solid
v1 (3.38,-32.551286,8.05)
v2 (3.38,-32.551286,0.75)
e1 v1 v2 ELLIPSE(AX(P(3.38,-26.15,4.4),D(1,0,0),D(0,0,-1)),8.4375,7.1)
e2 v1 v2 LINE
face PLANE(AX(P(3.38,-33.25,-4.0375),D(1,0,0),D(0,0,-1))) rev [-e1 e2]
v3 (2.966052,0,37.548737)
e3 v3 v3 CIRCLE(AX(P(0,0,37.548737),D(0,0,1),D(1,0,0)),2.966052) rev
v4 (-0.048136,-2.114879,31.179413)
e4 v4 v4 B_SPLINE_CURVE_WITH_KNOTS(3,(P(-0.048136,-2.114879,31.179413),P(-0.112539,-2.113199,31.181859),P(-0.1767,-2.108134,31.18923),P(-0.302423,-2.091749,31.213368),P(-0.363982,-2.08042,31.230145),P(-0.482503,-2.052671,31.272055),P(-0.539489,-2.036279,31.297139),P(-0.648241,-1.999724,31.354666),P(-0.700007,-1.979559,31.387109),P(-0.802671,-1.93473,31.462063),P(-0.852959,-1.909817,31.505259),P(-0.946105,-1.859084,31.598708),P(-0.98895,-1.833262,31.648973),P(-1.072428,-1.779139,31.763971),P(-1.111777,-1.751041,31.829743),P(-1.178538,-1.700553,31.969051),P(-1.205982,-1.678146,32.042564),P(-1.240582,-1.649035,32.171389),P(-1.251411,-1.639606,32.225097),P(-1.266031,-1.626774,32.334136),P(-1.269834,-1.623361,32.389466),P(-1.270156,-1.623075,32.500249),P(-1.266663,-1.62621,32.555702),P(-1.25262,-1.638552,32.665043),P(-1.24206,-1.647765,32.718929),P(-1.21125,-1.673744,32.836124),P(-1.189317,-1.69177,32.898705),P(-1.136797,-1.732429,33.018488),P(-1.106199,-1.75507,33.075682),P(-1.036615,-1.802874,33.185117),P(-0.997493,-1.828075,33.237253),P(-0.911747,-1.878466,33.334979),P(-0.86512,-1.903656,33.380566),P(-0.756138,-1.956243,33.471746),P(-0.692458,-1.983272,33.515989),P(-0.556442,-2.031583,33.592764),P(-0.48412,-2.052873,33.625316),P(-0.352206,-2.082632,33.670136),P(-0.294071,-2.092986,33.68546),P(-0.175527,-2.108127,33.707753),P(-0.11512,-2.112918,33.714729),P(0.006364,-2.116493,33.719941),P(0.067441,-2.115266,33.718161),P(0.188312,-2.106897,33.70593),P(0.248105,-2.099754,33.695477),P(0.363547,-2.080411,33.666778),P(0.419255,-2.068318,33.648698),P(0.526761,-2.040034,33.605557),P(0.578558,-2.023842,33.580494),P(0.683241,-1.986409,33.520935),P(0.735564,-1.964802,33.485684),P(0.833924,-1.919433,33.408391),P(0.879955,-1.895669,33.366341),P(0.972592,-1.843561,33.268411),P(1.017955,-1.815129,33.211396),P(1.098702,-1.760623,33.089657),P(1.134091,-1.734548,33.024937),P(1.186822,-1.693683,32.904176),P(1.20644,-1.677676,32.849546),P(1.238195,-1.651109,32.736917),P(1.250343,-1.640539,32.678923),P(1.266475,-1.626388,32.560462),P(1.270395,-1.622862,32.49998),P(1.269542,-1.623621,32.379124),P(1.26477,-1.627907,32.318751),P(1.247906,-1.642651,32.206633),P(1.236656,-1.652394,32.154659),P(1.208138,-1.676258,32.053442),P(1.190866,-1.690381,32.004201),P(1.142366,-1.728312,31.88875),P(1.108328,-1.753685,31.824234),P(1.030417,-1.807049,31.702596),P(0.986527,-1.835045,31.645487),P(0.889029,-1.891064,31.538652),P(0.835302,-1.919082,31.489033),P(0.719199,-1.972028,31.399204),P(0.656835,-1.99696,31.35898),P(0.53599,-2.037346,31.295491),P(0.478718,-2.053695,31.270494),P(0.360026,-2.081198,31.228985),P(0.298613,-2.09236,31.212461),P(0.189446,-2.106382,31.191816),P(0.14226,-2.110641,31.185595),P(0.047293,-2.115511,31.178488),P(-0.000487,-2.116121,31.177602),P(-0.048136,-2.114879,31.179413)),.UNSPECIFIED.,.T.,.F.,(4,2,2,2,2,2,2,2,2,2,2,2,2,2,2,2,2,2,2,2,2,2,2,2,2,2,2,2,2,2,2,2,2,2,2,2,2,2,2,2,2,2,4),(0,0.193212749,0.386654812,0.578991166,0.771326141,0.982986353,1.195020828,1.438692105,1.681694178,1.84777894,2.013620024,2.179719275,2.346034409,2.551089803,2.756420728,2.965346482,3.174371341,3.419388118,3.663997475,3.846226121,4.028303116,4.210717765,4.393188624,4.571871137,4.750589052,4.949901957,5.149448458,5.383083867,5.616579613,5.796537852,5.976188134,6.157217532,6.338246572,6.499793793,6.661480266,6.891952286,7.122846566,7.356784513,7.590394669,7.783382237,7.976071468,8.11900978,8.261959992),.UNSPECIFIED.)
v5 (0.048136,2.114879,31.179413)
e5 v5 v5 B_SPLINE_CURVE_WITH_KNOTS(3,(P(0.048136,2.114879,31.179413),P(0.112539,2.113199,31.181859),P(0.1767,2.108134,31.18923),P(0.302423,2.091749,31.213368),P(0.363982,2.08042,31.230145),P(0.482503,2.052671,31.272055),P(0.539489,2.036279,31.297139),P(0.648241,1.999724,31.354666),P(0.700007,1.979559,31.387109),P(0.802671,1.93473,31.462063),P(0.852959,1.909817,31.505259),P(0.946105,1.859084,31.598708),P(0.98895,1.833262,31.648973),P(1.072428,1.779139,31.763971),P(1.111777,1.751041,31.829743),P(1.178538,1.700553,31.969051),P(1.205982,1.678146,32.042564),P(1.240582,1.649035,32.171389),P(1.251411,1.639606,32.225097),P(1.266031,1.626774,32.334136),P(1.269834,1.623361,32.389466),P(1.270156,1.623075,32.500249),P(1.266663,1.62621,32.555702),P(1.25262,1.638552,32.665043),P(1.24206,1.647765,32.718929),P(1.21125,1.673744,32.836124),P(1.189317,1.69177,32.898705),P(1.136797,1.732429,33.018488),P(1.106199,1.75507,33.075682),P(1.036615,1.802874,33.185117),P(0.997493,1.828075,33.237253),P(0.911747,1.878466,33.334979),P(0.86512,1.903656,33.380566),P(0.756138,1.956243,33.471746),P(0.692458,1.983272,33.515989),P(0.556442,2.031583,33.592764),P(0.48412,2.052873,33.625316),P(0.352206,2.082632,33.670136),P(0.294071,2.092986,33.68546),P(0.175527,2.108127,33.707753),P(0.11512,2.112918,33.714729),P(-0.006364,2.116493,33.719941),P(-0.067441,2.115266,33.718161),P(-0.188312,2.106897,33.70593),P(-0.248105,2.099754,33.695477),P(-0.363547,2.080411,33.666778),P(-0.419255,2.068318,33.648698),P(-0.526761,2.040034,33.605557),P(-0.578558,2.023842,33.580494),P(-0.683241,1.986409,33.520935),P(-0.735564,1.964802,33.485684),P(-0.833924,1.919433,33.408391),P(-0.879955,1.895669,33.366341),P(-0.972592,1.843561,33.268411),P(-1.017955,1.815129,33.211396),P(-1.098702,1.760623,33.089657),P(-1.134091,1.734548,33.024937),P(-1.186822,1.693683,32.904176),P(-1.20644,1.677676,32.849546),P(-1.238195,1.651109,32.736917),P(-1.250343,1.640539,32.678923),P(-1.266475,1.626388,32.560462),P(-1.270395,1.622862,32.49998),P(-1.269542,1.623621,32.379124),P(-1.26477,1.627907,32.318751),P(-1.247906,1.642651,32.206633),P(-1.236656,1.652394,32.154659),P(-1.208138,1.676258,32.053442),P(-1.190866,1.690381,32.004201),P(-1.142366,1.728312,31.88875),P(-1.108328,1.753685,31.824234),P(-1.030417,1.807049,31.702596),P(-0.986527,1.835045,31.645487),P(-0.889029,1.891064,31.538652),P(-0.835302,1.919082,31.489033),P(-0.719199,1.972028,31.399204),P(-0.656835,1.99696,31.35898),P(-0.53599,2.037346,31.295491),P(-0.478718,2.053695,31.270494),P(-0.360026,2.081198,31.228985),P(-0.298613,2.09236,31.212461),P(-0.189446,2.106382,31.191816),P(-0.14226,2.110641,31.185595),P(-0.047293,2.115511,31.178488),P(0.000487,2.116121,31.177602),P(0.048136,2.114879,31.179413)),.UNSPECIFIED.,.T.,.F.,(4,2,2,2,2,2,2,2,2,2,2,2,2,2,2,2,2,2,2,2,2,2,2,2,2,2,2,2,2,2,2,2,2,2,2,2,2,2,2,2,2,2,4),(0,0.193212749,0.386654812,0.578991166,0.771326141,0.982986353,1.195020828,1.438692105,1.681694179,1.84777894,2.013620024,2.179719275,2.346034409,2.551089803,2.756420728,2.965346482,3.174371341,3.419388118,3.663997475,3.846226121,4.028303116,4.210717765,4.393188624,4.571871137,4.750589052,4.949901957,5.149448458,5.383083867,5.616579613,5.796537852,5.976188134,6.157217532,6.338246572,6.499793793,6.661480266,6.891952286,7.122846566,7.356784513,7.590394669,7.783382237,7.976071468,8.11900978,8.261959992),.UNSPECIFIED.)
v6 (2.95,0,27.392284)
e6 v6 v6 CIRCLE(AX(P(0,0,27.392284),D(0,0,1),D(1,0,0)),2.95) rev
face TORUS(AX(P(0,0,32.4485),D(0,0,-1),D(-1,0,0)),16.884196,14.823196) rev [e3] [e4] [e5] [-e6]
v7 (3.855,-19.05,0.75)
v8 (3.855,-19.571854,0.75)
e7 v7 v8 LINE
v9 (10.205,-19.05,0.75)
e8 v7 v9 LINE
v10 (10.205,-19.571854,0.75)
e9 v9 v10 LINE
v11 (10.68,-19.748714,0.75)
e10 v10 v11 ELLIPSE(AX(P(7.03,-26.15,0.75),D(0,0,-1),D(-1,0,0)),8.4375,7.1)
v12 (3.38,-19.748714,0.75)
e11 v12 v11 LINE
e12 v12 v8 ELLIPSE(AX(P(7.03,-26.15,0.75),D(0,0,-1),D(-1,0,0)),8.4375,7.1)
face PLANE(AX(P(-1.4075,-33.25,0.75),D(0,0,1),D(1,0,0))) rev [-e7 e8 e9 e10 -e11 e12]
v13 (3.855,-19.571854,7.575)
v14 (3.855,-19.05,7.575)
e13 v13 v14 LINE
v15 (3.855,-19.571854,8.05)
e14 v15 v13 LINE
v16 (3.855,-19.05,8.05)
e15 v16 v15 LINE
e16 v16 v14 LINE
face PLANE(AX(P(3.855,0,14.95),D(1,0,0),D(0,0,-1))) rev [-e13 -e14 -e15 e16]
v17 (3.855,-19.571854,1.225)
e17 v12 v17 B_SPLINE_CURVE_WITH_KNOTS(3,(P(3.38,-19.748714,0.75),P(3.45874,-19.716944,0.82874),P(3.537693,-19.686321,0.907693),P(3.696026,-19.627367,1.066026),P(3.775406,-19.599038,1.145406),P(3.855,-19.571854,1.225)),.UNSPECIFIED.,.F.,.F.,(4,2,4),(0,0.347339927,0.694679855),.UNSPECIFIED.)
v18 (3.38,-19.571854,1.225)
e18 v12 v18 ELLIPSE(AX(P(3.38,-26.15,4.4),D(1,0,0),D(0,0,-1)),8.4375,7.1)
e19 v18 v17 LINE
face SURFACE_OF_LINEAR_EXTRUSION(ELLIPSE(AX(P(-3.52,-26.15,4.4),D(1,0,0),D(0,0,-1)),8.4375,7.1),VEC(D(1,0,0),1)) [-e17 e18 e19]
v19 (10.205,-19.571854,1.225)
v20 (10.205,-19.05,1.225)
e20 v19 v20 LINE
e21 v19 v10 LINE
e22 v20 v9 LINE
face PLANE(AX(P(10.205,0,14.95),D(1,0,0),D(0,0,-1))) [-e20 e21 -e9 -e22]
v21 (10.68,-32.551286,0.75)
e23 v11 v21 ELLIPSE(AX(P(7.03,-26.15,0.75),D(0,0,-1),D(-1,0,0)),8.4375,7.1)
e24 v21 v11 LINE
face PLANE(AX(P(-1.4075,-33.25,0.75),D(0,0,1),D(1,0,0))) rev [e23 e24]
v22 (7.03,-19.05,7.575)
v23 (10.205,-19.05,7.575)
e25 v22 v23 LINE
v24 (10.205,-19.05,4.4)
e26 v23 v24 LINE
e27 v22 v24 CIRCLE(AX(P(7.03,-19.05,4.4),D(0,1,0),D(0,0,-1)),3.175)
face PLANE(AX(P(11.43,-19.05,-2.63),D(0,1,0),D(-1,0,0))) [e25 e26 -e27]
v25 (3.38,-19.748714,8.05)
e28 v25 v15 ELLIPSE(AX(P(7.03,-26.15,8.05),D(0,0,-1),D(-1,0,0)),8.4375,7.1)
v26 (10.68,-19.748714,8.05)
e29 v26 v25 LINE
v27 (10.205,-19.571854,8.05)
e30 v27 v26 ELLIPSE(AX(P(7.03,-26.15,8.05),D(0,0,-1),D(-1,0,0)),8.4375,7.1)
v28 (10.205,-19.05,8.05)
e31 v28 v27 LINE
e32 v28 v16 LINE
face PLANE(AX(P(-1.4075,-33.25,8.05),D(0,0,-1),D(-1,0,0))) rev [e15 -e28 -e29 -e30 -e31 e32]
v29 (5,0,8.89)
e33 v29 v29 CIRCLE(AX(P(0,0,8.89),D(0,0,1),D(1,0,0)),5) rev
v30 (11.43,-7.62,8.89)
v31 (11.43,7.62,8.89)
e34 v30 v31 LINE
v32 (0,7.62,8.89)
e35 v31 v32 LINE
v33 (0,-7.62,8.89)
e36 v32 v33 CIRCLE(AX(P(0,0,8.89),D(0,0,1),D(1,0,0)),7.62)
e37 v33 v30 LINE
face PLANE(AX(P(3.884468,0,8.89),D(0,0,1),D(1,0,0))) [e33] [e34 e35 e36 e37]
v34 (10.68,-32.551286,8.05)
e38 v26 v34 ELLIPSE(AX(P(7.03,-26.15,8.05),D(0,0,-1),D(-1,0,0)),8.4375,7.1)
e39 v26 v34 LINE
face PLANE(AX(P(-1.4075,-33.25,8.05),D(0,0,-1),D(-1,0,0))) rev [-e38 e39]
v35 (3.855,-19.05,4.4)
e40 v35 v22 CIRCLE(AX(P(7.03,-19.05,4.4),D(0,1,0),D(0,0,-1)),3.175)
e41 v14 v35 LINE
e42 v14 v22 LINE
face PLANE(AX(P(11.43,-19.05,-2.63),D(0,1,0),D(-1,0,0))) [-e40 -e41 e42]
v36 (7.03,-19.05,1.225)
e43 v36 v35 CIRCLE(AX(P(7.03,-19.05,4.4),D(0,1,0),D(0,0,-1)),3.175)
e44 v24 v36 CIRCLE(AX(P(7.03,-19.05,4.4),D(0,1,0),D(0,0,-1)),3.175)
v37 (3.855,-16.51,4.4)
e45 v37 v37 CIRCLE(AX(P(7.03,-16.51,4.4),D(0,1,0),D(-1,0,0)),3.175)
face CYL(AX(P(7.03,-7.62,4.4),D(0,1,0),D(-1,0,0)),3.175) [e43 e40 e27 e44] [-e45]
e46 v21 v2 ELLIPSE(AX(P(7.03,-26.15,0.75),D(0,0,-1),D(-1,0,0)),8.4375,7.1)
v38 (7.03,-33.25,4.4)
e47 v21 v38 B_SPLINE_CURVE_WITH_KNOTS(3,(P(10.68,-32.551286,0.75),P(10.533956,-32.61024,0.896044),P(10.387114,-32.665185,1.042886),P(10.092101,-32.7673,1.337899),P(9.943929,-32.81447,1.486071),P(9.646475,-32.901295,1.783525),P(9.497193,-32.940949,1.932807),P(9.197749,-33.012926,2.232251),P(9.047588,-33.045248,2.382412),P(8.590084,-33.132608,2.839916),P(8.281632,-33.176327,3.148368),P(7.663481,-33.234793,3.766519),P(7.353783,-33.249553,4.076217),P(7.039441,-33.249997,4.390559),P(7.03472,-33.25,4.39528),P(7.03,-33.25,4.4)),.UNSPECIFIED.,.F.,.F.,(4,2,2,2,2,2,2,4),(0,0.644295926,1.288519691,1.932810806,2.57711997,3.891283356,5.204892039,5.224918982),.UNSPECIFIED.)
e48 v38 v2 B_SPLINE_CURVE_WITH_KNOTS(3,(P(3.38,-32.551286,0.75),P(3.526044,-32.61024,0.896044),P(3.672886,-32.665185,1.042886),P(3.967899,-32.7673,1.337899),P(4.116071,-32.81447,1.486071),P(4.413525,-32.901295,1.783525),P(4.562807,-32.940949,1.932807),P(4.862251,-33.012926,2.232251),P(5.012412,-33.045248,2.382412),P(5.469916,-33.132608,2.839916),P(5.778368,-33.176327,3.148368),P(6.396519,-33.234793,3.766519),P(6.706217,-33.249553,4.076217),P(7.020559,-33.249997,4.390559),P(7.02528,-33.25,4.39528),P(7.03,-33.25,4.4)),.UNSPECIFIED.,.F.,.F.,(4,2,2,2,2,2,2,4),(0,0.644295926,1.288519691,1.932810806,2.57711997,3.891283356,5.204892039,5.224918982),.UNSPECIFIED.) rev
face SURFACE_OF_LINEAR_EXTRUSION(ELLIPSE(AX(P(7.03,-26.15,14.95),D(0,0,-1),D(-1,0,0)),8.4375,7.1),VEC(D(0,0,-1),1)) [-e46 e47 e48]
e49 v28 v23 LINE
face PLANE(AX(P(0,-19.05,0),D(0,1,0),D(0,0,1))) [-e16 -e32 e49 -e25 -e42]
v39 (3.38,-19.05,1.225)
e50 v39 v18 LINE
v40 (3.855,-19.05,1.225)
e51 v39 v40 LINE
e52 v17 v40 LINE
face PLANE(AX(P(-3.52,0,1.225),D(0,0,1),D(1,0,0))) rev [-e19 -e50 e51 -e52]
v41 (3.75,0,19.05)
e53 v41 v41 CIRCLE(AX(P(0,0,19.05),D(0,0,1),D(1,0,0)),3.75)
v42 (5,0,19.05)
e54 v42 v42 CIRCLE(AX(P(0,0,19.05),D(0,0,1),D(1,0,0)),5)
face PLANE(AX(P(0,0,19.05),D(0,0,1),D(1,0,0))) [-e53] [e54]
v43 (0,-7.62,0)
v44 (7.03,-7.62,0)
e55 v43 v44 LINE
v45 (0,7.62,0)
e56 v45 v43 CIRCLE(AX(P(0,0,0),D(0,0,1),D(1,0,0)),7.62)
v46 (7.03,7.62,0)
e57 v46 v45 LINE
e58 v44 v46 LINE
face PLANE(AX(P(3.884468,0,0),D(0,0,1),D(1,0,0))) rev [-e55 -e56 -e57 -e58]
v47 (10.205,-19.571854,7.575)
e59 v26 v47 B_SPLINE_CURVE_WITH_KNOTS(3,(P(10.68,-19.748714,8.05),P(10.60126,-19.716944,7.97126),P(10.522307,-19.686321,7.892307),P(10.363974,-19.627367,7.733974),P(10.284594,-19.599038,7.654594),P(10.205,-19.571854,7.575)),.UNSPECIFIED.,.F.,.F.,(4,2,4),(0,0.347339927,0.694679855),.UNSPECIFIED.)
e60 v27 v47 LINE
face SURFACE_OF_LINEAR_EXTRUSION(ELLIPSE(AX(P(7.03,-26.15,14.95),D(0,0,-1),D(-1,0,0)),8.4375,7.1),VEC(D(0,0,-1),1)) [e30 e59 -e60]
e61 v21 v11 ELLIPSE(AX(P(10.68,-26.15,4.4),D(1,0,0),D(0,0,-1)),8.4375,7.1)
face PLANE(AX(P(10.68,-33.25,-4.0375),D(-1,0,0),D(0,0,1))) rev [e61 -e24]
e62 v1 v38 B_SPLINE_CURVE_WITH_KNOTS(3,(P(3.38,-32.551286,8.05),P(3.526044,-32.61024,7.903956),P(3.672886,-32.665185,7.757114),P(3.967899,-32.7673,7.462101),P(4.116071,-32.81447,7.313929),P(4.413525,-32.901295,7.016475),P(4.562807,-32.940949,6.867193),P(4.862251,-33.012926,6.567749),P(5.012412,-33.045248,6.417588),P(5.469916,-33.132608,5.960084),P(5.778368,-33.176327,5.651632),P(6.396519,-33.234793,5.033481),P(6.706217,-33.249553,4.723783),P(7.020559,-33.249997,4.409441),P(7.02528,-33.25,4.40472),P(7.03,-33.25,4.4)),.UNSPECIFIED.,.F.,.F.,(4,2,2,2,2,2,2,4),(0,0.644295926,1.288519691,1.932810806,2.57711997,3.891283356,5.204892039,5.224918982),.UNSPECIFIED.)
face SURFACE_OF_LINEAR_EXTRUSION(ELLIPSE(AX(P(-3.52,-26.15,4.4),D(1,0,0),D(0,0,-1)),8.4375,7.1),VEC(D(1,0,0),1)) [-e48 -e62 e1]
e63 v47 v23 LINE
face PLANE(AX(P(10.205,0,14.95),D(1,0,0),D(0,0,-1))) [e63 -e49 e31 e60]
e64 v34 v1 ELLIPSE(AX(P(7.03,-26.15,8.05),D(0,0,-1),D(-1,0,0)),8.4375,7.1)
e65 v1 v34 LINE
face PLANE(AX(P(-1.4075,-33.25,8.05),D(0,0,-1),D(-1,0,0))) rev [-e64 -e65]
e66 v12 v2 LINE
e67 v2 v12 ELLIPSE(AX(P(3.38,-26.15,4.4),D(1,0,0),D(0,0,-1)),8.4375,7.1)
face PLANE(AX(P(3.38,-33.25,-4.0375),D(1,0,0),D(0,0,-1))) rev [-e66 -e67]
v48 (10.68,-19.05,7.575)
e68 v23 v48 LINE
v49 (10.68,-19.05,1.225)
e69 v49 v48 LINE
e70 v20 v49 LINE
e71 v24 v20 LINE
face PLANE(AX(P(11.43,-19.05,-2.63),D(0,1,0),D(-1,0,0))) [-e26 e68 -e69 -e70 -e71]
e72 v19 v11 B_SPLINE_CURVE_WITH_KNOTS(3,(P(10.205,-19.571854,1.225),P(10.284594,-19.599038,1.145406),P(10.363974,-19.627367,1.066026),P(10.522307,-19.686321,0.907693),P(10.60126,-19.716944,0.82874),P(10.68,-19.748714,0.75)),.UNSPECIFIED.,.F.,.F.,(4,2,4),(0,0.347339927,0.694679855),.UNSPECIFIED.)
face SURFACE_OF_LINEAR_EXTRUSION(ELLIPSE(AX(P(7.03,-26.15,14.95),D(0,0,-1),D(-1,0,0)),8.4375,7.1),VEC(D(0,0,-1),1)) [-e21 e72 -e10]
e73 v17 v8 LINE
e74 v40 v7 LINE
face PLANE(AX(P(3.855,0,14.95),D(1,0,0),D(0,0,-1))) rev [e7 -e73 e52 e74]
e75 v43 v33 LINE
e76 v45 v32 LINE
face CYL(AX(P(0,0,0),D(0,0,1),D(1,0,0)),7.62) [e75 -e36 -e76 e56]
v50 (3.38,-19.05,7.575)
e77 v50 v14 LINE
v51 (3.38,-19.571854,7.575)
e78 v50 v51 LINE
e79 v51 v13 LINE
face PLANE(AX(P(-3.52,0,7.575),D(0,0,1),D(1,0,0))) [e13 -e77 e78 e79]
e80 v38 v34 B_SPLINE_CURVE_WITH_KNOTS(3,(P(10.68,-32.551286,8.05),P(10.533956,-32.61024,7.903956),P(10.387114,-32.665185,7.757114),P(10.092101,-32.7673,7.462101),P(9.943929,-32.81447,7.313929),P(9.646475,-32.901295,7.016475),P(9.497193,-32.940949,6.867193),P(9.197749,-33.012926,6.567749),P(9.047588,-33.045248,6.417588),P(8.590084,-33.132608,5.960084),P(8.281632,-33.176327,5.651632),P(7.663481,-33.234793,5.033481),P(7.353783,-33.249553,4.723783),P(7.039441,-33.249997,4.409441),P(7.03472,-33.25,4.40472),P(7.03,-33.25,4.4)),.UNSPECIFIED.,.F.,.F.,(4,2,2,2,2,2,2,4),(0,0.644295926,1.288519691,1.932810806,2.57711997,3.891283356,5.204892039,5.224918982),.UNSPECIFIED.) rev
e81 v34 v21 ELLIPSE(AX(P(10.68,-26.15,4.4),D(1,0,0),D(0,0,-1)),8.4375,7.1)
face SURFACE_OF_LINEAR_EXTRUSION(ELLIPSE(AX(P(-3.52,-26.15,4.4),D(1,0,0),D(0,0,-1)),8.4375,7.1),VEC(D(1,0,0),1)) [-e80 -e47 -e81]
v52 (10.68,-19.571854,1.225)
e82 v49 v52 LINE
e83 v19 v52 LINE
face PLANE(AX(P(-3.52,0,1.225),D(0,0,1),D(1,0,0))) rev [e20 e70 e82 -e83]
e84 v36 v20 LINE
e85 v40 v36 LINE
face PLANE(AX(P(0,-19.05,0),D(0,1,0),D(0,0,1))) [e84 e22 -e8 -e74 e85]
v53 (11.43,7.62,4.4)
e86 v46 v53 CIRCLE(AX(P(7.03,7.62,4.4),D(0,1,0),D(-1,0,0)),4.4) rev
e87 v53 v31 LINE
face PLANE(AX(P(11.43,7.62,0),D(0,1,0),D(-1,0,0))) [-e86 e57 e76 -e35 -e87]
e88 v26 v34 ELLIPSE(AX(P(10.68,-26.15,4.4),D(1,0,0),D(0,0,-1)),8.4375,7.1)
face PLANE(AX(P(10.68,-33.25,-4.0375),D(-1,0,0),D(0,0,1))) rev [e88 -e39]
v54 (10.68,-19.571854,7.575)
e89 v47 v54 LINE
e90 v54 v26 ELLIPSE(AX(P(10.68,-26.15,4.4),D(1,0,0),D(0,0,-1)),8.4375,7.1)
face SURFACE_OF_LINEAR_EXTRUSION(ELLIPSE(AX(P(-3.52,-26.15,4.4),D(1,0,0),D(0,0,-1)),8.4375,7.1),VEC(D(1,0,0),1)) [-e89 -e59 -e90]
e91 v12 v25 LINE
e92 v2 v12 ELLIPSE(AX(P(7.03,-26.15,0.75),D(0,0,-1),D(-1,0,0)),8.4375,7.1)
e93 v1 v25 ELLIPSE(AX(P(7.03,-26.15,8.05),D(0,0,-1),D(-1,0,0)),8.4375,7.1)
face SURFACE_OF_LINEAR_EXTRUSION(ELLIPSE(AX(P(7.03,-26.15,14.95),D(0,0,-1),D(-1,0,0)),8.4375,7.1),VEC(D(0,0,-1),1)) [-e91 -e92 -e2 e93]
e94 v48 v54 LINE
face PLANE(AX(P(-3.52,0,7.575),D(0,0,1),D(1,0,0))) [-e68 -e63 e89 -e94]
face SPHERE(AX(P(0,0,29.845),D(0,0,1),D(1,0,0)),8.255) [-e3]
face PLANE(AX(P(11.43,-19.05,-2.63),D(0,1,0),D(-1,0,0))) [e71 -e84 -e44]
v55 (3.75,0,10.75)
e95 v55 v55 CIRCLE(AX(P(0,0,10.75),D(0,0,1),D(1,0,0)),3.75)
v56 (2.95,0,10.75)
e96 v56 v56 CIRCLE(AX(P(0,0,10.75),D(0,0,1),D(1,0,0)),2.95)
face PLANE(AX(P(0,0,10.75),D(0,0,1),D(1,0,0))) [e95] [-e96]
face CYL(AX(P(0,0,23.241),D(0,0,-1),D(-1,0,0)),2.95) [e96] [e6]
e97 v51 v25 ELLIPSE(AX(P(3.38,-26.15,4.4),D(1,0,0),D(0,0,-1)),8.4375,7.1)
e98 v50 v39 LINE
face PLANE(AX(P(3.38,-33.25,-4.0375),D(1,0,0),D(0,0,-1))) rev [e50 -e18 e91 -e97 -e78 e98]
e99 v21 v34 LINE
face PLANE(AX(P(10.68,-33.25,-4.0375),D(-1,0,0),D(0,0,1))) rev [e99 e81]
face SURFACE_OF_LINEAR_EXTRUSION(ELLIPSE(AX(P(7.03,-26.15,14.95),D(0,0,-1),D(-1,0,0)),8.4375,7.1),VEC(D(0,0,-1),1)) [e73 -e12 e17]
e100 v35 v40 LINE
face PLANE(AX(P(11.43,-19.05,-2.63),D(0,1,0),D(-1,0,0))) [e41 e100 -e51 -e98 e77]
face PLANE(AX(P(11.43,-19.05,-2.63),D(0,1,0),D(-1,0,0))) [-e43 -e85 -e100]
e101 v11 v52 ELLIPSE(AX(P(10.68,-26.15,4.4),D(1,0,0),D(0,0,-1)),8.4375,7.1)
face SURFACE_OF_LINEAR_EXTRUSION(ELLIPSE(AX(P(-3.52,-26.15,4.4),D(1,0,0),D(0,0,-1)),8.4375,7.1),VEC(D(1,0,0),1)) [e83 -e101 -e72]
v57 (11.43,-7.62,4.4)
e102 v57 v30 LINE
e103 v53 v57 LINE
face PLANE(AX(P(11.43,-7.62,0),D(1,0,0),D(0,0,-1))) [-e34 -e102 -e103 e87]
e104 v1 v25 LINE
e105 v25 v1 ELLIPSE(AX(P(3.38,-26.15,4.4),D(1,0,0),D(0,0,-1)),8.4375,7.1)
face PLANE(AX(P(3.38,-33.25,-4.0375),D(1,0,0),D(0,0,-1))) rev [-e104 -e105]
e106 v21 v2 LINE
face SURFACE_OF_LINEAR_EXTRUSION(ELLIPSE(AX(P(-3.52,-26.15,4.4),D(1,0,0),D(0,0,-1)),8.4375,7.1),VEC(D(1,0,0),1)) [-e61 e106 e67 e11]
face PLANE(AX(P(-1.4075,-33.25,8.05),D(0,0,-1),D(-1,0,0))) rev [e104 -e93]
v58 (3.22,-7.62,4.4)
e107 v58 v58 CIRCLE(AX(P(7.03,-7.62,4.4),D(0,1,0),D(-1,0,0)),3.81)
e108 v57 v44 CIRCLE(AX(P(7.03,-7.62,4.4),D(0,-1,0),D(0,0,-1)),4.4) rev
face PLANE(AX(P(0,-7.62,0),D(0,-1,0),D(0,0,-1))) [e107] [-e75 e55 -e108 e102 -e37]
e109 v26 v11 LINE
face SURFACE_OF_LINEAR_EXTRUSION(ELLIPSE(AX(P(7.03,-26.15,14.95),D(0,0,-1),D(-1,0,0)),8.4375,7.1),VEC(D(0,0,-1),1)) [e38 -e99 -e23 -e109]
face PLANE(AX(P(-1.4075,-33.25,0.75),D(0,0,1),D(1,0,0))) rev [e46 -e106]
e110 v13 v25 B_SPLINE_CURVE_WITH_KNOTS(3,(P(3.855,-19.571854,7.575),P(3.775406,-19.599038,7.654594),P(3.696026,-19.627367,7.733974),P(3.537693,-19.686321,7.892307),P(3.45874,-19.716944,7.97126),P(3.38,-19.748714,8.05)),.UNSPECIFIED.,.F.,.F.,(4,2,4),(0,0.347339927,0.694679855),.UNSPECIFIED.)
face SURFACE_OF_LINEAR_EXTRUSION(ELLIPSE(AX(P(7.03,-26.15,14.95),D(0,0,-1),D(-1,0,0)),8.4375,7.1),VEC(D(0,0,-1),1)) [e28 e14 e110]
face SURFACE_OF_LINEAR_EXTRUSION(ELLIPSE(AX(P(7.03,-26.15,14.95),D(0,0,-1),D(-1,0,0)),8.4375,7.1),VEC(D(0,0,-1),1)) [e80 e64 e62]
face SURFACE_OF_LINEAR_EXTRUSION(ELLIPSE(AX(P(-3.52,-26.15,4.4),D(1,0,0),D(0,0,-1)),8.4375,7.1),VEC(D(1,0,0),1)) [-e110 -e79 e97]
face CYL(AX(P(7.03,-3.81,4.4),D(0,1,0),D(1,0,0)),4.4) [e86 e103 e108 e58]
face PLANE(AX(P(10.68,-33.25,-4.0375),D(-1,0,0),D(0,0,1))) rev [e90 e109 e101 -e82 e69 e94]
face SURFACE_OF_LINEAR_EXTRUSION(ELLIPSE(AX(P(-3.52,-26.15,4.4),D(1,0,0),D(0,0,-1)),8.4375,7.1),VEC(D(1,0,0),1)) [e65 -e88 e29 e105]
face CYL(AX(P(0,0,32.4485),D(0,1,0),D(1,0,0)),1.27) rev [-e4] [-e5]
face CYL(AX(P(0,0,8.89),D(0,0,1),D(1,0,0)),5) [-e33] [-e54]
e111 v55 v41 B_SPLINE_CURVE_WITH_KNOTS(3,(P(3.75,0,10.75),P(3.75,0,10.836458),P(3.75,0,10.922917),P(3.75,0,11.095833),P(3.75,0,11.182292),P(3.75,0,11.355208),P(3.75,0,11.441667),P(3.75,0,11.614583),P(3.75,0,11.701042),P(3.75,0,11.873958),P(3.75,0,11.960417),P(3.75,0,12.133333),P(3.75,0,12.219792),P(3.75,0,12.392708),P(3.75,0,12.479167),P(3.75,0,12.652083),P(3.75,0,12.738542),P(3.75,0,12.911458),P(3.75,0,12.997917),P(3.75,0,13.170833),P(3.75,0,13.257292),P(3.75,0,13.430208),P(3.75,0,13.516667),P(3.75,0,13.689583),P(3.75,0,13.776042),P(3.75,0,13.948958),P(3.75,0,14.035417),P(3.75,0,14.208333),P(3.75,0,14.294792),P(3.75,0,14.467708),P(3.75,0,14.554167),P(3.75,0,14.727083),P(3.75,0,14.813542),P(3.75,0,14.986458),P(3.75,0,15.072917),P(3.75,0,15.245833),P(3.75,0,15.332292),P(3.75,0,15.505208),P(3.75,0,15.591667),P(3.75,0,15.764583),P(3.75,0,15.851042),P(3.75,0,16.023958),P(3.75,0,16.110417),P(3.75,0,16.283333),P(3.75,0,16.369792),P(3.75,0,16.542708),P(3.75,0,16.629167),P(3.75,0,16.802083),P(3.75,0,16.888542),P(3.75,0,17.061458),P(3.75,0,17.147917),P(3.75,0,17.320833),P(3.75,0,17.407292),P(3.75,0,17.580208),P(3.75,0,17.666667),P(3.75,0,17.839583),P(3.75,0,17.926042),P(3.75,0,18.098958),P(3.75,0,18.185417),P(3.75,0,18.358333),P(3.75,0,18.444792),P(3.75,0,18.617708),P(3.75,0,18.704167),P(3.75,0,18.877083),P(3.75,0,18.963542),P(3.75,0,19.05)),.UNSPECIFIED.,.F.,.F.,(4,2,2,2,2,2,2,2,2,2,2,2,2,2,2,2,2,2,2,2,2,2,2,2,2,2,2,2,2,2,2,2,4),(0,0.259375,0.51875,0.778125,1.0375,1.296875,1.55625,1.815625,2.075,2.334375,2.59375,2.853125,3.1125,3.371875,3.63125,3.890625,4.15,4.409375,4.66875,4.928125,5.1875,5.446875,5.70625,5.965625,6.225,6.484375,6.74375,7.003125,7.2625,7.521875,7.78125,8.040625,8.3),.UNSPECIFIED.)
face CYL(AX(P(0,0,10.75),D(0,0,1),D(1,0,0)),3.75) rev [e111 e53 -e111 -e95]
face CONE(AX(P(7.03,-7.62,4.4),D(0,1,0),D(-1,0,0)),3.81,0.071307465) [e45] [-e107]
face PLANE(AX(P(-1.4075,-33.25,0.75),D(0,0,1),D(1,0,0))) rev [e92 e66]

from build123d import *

# Parameters (mm, degrees)
MOVE_START             = 1.86
MOVE_FACE1_DEPTH       = 5.08
MOVE_FACE1_2_OUTLINE_R = 5.08
MOVE_FACE1_2_DEPTH     = 19.05
MOVE_FACE1_3_OUTLINE_R = 5.08
MOVE_FACE1_3_DEPTH     = 8.89
MOVE_START_2           = 19.05
MOVE_FACE1_4_OUTLINE_R = 2.95
MOVE_FACE1_4_DEPTH     = 19.05
MOVE_START_3           = 6.731
MOVE_FACE1_5_OUTLINE_R = 1.125
MOVE_FACE1_5_DEPTH     = 2.159
MOVE_START_4           = -7.62
MOVE_FACE1_6_OUTLINE_R = 1.27
MOVE_FACE1_6_DEPTH     = 15.24
MOVE_START_5           = -19.05
MOVE_FACE1_7_OUTLINE_R = 3.81
MOVE_FACE1_7_DEPTH     = 11.43
CUT_EXTRUDE2_START     = -8.3
SKETCH4_R              = 3.75
SKETCH4_R_2            = 2.95
CUT_EXTRUDE2_DEPTH     = 8.3
MOVE_FACE2_BY          = 0.08
SKETCH6_W              = 22.532040778
SKETCH6_H              = 17.162622236
CUT_EXTRUDE3_DEPTH     = 16.1
SKETCH7_W              = 16.875
SKETCH7_H              = 7.3
BOSS_EXTRUDE1_DEPTH    = 14.2
CUT_EXTRUDE4_DEPTH     = 14.2
MOVE_START_6           = 3.38
MOVE_FACE5_DEPTH       = 7.3
CUT_EXTRUDE5_REACH     = 50.258


with BuildPart() as part:
    # Move Face1: read off the stored shape, not the designer's step
    # Move Face1 outline → Move Face1 (new body)
    with BuildSketch(Plane.XY.offset(MOVE_START)):
        with BuildLine():
            ThreePointArc((-3.511, -31.99383827), (7.03, -34.29), (17.571, -31.99383827))
            Line((17.571, -31.99383827), (17.571, -22.753852444))
            Line((17.571, -22.753852444), (11.389315764, -19.05))
            Line((11.389315764, -19.05), (2.670684236, -19.05))
            Line((2.670684236, -19.05), (-3.511, -22.753852444))
            Line((-3.511, -22.753852444), (-3.511, -31.99383827))
        make_face()
        with BuildLine():
            Line((0, -7.62), (11.43, -7.62))
            Line((11.43, -7.62), (11.43, 7.62))
            Line((11.43, 7.62), (0, 7.62))
            ThreePointArc((0, 7.62), (-7.62, 0), (0, -7.62))
        make_face()
    extrude(amount=MOVE_FACE1_DEPTH)

    # Move Face1 2 outline → Move Face1 2 (add)
    with BuildSketch(Plane.XY):
        Circle(MOVE_FACE1_2_OUTLINE_R)
    extrude(amount=MOVE_FACE1_2_DEPTH)

    # Move Face1 3 outline → Move Face1 3 (add)
    with BuildSketch(Plane.XY):
        with BuildLine():
            ThreePointArc((0, 7.62), (-7.62, 0), (0, -7.62))
            Line((0, -7.62), (11.43, -7.62))
            Line((11.43, -7.62), (11.43, 7.62))
            Line((11.43, 7.62), (0, 7.62))
        make_face()
        Circle(MOVE_FACE1_3_OUTLINE_R, mode=Mode.SUBTRACT)
    extrude(amount=MOVE_FACE1_3_DEPTH)

    # Move Face1 4 outline → Move Face1 4 (add)
    with BuildSketch(Plane.XY.offset(MOVE_START_2)):
        Circle(MOVE_FACE1_4_OUTLINE_R)
    extrude(amount=MOVE_FACE1_4_DEPTH)

    # Move Face1 5 outline → Move Face1 5 (add)
    with BuildSketch(Plane.XY.offset(MOVE_START_3)):
        with BuildLine():
            Line((-10.24004056, 5.820733333), (-7.414650266, 1.75708891))
            ThreePointArc((-7.414650266, 1.75708891), (-5.388153673, 5.388153673), (-1.75708891, 7.414650266))
            Line((-1.75708891, 7.414650266), (-5.820733333, 10.24004056))
            ThreePointArc((-5.820733333, 10.24004056), (-9.878281733, 9.878281733), (-10.24004056, 5.820733333))
        make_face()
        with Locations((-7.633217703, 7.633217703)):
            Circle(MOVE_FACE1_5_OUTLINE_R, mode=Mode.SUBTRACT)
    extrude(amount=MOVE_FACE1_5_DEPTH)

    # Move Face1 6 outline → Move Face1 6 (cut)
    with BuildSketch(Plane(origin=(0, 0, 0), x_dir=(1, 0, 0), z_dir=(0, 1, 0)).offset(MOVE_START_4)):
        with BuildLine():
            ThreePointArc((7.03, 0), (10.141269837, -1.288730163), (11.43, -4.4))
            Line((11.43, -4.4), (11.43, 0))
            Line((11.43, 0), (7.03, 0))
        make_face()
        with Locations((0, -32.4485)):
            Circle(MOVE_FACE1_6_OUTLINE_R)
    extrude(amount=MOVE_FACE1_6_DEPTH, mode=Mode.SUBTRACT)

    # Move Face1 7 outline → Move Face1 7 (add)
    with BuildSketch(Plane(origin=(0, 0, 0), x_dir=(1, 0, 0), z_dir=(0, 1, 0)).offset(MOVE_START_5)):
        with Locations((7.03, -4.4)):
            Circle(MOVE_FACE1_7_OUTLINE_R)
    extrude(amount=MOVE_FACE1_7_DEPTH)

    # Move Face1 8 outline → Move Face1 8 (revolve, cut)
    with BuildSketch(Plane.XZ):
        with BuildLine():
            ThreePointArc((0, 38.1), (1.499969695, 37.962580669), (2.95, 37.554897859))
            Line((2.95, 37.554897859), (2.95, 38.1))
            Line((2.95, 38.1), (0, 38.1))
        make_face()
        with BuildLine():
            Line((2.95, 27.392283801), (2.95, 37.504716198))
            ThreePointArc((2.95, 37.504716198), (2.061, 32.448499999), (2.95, 27.392283801))
        make_face()
    revolve(axis=Axis((0, 0, 0), (0, 0, 1)), mode=Mode.SUBTRACT)

    # Move Face1 9 outline → Move Face1 9 (revolve)
    with BuildSketch(Plane.XZ):
        with BuildLine():
            ThreePointArc((2.95, 37.504716198), (2.958008721, 37.526732793), (2.96605223, 37.548736702))
            ThreePointArc((2.96605223, 37.548736702), (2.958027723, 37.551821458), (2.95, 37.554897859))
            Line((2.95, 37.554897859), (2.95, 37.504716198))
        make_face()
    revolve(axis=Axis((0, 0, 0), (0, 0, 1)))

    # Sketch4 → Cut-Extrude2 (cut)
    with BuildSketch(Plane.XY.offset(19.05).offset(CUT_EXTRUDE2_START)):
        Circle(SKETCH4_R)
        Circle(SKETCH4_R_2, mode=Mode.SUBTRACT)
    extrude(amount=CUT_EXTRUDE2_DEPTH, mode=Mode.SUBTRACT)

    # Sketch5 → Cut-Revolve1 (revolve, cut)
    with BuildSketch(Plane(origin=(0, 0, 4.4), x_dir=(-1, 0, 0), z_dir=(0, 0, -1))):
        Polygon((-3.22, -7.62), (-3.22, -19.05), (-3.855, -19.05), (-3.855, -16.51), align=None)
    revolve(axis=Axis((7.03, -7.62, 4.4), (0, -1, 0)), mode=Mode.SUBTRACT)

    # Move Face2: a curved face moved inward by 0.08
    add(Solid.thicken(part.faces().sort_by_distance((-5.08, 0, 13.97))[0], -MOVE_FACE2_BY), mode=Mode.SUBTRACT)

    # Sketch6 → Cut-Extrude3 (cut)
    with BuildSketch(Plane.XY):
        with Locations((7.03, -27.631311118)):
            Rectangle(SKETCH6_W, SKETCH6_H)
    extrude(amount=CUT_EXTRUDE3_DEPTH, mode=Mode.SUBTRACT)

    # Sketch7 → Boss-Extrude1 (add)
    with BuildSketch(Plane.XZ.offset(19.05)):
        with Locations((7.03, 4.4)):
            Rectangle(SKETCH7_W, SKETCH7_H)
    extrude(amount=BOSS_EXTRUDE1_DEPTH)

    # Sketch8 → Cut-Extrude4 (cut)
    with BuildSketch(Plane(origin=(0, 0, 0.75), x_dir=(-1, 0, 0), z_dir=(0, 0, -1))):
        with BuildLine():
            Line((-10.205, -19.571854416), (-10.205, -19.05))
            Line((-10.205, -19.05), (-15.4675, -19.05))
            Line((-15.4675, -19.05), (-15.4675, -26.15))
            add(Edge.make_bspline(
                [(-10.205, -19.571854416), (-15.4675, -21.370400141), (-15.4675, -26.15)],
                knots=[1.956591838, 1.956591838, 1.956591838, 3.141592654, 3.141592654, 3.141592654], degree=2, weights=[1, 0.829546954, 1]))
        make_face()
        with BuildLine():
            Line((1.4075, -19.05), (-3.855, -19.05))
            Line((-3.855, -19.05), (-3.855, -19.571854416))
            add(Edge.make_bspline(
                [(1.4075, -26.15), (1.4075, -21.370400141), (-3.855, -19.571854416)],
                knots=[0, 0, 0, 1.185000816, 1.185000816, 1.185000816], degree=2, weights=[1, 0.829546954, 1]))
            Line((1.4075, -26.15), (1.4075, -19.05))
        make_face()
        with BuildLine():
            add(Edge.make_bspline(
                [(-15.4675, -26.15), (-15.4675, -33.25), (-7.03, -33.25)],
                knots=[3.141592654, 3.141592654, 3.141592654, 4.71238898, 4.71238898, 4.71238898], degree=2, weights=[1, 0.707106781, 1]))
            Line((-15.4675, -26.15), (-15.4675, -33.25))
            Line((-15.4675, -33.25), (-7.03, -33.25))
        make_face()
        with BuildLine():
            Line((1.4075, -33.25), (1.4075, -26.15))
            add(Edge.make_bspline(
                [(-7.03, -33.25), (1.4075, -33.25), (1.4075, -26.15)],
                knots=[4.71238898, 4.71238898, 4.71238898, 6.283185307, 6.283185307, 6.283185307], degree=2, weights=[1, 0.707106781, 1]))
            Line((-7.03, -33.25), (1.4075, -33.25))
        make_face()
    extrude(amount=-CUT_EXTRUDE4_DEPTH, mode=Mode.SUBTRACT)

    # Move Face5: read off the stored shape, not the designer's step
    # Move Face5 outline → Move Face5 (add)
    with BuildSketch(Plane.YZ.offset(MOVE_START_6)):
        with BuildLine():
            Line((-32.551285538, 0.75), (-19.748714462, 0.75))
            add(Edge.make_bspline(
                [(-19.748714462, 0.75), (-19.654129969, 0.984263783), (-19.571854416, 1.225)],
                knots=[1.123429947, 1.123429947, 1.123429947, 1.185000816, 1.185000816, 1.185000816], degree=2, weights=[1, 0.999526166, 1]))
            Line((-19.571854416, 1.225), (-19.05, 1.225))
            Line((-19.05, 1.225), (-19.05, 7.575))
            Line((-19.05, 7.575), (-19.571854416, 7.575))
            add(Edge.make_bspline(
                [(-19.571854416, 7.575), (-19.654129969, 7.815736217), (-19.748714462, 8.05)],
                knots=[1.956591838, 1.956591838, 1.956591838, 2.018162706, 2.018162706, 2.018162706], degree=2, weights=[1, 0.999526166, 1]))
            Line((-19.748714462, 8.05), (-32.551285538, 8.05))
            add(Edge.make_bspline(
                [(-32.551285538, 8.05), (-34.02498069, 4.4), (-32.551285538, 0.75)],
                knots=[4.265022601, 4.265022601, 4.265022601, 5.15975536, 5.15975536, 5.15975536], degree=2, weights=[1, 0.901589512, 1]))
        make_face()
        with BuildLine():
            add(Edge.make_bspline(
                [(-32.551285538, 0.75), (-26.15, -15.104494863), (-19.748714462, 0.75)],
                knots=[5.15975536, 5.15975536, 5.15975536, 7.406615254, 7.406615254, 7.406615254], degree=2, weights=[1, 0.432592593, 1]))
            Line((-19.748714462, 0.75), (-32.551285538, 0.75))
        make_face()
        with BuildLine():
            add(Edge.make_bspline(
                [(-19.748714462, 8.05), (-26.15, 23.904494863), (-32.551285538, 8.05)],
                knots=[2.018162706, 2.018162706, 2.018162706, 4.265022601, 4.265022601, 4.265022601], degree=2, weights=[1, 0.432592593, 1]))
            Line((-32.551285538, 8.05), (-19.748714462, 8.05))
        make_face()
    extrude(amount=MOVE_FACE5_DEPTH)

    # Sketch10 → Cut-Extrude5 (cut, up to next)
    with BuildSketch(Plane(origin=(0, 0, 6.731), x_dir=(-1, 0, 0), z_dir=(0, 0, -1)), mode=Mode.PRIVATE) as cut_extrude5_sk1:
        with BuildLine():
            Line((5.820733333, 10.24004056), (1.75708891, 7.414650266))
            ThreePointArc((1.75708891, 7.414650266), (5.388153673, 5.388153673), (7.414650266, 1.75708891))
            Line((7.414650266, 1.75708891), (10.24004056, 5.820733333))
            ThreePointArc((10.24004056, 5.820733333), (9.878281733, 9.878281733), (5.820733333, 10.24004056))
        make_face()
    cut_extrude5_tool1 = extrude(cut_extrude5_sk1.sketch, amount=-CUT_EXTRUDE5_REACH, mode=Mode.PRIVATE) & part.part
    add(cut_extrude5_tool1.solids().sort_by_distance((-7.209511, 7.209511, 6.731))[0], mode=Mode.SUBTRACT)


solid = part.part
